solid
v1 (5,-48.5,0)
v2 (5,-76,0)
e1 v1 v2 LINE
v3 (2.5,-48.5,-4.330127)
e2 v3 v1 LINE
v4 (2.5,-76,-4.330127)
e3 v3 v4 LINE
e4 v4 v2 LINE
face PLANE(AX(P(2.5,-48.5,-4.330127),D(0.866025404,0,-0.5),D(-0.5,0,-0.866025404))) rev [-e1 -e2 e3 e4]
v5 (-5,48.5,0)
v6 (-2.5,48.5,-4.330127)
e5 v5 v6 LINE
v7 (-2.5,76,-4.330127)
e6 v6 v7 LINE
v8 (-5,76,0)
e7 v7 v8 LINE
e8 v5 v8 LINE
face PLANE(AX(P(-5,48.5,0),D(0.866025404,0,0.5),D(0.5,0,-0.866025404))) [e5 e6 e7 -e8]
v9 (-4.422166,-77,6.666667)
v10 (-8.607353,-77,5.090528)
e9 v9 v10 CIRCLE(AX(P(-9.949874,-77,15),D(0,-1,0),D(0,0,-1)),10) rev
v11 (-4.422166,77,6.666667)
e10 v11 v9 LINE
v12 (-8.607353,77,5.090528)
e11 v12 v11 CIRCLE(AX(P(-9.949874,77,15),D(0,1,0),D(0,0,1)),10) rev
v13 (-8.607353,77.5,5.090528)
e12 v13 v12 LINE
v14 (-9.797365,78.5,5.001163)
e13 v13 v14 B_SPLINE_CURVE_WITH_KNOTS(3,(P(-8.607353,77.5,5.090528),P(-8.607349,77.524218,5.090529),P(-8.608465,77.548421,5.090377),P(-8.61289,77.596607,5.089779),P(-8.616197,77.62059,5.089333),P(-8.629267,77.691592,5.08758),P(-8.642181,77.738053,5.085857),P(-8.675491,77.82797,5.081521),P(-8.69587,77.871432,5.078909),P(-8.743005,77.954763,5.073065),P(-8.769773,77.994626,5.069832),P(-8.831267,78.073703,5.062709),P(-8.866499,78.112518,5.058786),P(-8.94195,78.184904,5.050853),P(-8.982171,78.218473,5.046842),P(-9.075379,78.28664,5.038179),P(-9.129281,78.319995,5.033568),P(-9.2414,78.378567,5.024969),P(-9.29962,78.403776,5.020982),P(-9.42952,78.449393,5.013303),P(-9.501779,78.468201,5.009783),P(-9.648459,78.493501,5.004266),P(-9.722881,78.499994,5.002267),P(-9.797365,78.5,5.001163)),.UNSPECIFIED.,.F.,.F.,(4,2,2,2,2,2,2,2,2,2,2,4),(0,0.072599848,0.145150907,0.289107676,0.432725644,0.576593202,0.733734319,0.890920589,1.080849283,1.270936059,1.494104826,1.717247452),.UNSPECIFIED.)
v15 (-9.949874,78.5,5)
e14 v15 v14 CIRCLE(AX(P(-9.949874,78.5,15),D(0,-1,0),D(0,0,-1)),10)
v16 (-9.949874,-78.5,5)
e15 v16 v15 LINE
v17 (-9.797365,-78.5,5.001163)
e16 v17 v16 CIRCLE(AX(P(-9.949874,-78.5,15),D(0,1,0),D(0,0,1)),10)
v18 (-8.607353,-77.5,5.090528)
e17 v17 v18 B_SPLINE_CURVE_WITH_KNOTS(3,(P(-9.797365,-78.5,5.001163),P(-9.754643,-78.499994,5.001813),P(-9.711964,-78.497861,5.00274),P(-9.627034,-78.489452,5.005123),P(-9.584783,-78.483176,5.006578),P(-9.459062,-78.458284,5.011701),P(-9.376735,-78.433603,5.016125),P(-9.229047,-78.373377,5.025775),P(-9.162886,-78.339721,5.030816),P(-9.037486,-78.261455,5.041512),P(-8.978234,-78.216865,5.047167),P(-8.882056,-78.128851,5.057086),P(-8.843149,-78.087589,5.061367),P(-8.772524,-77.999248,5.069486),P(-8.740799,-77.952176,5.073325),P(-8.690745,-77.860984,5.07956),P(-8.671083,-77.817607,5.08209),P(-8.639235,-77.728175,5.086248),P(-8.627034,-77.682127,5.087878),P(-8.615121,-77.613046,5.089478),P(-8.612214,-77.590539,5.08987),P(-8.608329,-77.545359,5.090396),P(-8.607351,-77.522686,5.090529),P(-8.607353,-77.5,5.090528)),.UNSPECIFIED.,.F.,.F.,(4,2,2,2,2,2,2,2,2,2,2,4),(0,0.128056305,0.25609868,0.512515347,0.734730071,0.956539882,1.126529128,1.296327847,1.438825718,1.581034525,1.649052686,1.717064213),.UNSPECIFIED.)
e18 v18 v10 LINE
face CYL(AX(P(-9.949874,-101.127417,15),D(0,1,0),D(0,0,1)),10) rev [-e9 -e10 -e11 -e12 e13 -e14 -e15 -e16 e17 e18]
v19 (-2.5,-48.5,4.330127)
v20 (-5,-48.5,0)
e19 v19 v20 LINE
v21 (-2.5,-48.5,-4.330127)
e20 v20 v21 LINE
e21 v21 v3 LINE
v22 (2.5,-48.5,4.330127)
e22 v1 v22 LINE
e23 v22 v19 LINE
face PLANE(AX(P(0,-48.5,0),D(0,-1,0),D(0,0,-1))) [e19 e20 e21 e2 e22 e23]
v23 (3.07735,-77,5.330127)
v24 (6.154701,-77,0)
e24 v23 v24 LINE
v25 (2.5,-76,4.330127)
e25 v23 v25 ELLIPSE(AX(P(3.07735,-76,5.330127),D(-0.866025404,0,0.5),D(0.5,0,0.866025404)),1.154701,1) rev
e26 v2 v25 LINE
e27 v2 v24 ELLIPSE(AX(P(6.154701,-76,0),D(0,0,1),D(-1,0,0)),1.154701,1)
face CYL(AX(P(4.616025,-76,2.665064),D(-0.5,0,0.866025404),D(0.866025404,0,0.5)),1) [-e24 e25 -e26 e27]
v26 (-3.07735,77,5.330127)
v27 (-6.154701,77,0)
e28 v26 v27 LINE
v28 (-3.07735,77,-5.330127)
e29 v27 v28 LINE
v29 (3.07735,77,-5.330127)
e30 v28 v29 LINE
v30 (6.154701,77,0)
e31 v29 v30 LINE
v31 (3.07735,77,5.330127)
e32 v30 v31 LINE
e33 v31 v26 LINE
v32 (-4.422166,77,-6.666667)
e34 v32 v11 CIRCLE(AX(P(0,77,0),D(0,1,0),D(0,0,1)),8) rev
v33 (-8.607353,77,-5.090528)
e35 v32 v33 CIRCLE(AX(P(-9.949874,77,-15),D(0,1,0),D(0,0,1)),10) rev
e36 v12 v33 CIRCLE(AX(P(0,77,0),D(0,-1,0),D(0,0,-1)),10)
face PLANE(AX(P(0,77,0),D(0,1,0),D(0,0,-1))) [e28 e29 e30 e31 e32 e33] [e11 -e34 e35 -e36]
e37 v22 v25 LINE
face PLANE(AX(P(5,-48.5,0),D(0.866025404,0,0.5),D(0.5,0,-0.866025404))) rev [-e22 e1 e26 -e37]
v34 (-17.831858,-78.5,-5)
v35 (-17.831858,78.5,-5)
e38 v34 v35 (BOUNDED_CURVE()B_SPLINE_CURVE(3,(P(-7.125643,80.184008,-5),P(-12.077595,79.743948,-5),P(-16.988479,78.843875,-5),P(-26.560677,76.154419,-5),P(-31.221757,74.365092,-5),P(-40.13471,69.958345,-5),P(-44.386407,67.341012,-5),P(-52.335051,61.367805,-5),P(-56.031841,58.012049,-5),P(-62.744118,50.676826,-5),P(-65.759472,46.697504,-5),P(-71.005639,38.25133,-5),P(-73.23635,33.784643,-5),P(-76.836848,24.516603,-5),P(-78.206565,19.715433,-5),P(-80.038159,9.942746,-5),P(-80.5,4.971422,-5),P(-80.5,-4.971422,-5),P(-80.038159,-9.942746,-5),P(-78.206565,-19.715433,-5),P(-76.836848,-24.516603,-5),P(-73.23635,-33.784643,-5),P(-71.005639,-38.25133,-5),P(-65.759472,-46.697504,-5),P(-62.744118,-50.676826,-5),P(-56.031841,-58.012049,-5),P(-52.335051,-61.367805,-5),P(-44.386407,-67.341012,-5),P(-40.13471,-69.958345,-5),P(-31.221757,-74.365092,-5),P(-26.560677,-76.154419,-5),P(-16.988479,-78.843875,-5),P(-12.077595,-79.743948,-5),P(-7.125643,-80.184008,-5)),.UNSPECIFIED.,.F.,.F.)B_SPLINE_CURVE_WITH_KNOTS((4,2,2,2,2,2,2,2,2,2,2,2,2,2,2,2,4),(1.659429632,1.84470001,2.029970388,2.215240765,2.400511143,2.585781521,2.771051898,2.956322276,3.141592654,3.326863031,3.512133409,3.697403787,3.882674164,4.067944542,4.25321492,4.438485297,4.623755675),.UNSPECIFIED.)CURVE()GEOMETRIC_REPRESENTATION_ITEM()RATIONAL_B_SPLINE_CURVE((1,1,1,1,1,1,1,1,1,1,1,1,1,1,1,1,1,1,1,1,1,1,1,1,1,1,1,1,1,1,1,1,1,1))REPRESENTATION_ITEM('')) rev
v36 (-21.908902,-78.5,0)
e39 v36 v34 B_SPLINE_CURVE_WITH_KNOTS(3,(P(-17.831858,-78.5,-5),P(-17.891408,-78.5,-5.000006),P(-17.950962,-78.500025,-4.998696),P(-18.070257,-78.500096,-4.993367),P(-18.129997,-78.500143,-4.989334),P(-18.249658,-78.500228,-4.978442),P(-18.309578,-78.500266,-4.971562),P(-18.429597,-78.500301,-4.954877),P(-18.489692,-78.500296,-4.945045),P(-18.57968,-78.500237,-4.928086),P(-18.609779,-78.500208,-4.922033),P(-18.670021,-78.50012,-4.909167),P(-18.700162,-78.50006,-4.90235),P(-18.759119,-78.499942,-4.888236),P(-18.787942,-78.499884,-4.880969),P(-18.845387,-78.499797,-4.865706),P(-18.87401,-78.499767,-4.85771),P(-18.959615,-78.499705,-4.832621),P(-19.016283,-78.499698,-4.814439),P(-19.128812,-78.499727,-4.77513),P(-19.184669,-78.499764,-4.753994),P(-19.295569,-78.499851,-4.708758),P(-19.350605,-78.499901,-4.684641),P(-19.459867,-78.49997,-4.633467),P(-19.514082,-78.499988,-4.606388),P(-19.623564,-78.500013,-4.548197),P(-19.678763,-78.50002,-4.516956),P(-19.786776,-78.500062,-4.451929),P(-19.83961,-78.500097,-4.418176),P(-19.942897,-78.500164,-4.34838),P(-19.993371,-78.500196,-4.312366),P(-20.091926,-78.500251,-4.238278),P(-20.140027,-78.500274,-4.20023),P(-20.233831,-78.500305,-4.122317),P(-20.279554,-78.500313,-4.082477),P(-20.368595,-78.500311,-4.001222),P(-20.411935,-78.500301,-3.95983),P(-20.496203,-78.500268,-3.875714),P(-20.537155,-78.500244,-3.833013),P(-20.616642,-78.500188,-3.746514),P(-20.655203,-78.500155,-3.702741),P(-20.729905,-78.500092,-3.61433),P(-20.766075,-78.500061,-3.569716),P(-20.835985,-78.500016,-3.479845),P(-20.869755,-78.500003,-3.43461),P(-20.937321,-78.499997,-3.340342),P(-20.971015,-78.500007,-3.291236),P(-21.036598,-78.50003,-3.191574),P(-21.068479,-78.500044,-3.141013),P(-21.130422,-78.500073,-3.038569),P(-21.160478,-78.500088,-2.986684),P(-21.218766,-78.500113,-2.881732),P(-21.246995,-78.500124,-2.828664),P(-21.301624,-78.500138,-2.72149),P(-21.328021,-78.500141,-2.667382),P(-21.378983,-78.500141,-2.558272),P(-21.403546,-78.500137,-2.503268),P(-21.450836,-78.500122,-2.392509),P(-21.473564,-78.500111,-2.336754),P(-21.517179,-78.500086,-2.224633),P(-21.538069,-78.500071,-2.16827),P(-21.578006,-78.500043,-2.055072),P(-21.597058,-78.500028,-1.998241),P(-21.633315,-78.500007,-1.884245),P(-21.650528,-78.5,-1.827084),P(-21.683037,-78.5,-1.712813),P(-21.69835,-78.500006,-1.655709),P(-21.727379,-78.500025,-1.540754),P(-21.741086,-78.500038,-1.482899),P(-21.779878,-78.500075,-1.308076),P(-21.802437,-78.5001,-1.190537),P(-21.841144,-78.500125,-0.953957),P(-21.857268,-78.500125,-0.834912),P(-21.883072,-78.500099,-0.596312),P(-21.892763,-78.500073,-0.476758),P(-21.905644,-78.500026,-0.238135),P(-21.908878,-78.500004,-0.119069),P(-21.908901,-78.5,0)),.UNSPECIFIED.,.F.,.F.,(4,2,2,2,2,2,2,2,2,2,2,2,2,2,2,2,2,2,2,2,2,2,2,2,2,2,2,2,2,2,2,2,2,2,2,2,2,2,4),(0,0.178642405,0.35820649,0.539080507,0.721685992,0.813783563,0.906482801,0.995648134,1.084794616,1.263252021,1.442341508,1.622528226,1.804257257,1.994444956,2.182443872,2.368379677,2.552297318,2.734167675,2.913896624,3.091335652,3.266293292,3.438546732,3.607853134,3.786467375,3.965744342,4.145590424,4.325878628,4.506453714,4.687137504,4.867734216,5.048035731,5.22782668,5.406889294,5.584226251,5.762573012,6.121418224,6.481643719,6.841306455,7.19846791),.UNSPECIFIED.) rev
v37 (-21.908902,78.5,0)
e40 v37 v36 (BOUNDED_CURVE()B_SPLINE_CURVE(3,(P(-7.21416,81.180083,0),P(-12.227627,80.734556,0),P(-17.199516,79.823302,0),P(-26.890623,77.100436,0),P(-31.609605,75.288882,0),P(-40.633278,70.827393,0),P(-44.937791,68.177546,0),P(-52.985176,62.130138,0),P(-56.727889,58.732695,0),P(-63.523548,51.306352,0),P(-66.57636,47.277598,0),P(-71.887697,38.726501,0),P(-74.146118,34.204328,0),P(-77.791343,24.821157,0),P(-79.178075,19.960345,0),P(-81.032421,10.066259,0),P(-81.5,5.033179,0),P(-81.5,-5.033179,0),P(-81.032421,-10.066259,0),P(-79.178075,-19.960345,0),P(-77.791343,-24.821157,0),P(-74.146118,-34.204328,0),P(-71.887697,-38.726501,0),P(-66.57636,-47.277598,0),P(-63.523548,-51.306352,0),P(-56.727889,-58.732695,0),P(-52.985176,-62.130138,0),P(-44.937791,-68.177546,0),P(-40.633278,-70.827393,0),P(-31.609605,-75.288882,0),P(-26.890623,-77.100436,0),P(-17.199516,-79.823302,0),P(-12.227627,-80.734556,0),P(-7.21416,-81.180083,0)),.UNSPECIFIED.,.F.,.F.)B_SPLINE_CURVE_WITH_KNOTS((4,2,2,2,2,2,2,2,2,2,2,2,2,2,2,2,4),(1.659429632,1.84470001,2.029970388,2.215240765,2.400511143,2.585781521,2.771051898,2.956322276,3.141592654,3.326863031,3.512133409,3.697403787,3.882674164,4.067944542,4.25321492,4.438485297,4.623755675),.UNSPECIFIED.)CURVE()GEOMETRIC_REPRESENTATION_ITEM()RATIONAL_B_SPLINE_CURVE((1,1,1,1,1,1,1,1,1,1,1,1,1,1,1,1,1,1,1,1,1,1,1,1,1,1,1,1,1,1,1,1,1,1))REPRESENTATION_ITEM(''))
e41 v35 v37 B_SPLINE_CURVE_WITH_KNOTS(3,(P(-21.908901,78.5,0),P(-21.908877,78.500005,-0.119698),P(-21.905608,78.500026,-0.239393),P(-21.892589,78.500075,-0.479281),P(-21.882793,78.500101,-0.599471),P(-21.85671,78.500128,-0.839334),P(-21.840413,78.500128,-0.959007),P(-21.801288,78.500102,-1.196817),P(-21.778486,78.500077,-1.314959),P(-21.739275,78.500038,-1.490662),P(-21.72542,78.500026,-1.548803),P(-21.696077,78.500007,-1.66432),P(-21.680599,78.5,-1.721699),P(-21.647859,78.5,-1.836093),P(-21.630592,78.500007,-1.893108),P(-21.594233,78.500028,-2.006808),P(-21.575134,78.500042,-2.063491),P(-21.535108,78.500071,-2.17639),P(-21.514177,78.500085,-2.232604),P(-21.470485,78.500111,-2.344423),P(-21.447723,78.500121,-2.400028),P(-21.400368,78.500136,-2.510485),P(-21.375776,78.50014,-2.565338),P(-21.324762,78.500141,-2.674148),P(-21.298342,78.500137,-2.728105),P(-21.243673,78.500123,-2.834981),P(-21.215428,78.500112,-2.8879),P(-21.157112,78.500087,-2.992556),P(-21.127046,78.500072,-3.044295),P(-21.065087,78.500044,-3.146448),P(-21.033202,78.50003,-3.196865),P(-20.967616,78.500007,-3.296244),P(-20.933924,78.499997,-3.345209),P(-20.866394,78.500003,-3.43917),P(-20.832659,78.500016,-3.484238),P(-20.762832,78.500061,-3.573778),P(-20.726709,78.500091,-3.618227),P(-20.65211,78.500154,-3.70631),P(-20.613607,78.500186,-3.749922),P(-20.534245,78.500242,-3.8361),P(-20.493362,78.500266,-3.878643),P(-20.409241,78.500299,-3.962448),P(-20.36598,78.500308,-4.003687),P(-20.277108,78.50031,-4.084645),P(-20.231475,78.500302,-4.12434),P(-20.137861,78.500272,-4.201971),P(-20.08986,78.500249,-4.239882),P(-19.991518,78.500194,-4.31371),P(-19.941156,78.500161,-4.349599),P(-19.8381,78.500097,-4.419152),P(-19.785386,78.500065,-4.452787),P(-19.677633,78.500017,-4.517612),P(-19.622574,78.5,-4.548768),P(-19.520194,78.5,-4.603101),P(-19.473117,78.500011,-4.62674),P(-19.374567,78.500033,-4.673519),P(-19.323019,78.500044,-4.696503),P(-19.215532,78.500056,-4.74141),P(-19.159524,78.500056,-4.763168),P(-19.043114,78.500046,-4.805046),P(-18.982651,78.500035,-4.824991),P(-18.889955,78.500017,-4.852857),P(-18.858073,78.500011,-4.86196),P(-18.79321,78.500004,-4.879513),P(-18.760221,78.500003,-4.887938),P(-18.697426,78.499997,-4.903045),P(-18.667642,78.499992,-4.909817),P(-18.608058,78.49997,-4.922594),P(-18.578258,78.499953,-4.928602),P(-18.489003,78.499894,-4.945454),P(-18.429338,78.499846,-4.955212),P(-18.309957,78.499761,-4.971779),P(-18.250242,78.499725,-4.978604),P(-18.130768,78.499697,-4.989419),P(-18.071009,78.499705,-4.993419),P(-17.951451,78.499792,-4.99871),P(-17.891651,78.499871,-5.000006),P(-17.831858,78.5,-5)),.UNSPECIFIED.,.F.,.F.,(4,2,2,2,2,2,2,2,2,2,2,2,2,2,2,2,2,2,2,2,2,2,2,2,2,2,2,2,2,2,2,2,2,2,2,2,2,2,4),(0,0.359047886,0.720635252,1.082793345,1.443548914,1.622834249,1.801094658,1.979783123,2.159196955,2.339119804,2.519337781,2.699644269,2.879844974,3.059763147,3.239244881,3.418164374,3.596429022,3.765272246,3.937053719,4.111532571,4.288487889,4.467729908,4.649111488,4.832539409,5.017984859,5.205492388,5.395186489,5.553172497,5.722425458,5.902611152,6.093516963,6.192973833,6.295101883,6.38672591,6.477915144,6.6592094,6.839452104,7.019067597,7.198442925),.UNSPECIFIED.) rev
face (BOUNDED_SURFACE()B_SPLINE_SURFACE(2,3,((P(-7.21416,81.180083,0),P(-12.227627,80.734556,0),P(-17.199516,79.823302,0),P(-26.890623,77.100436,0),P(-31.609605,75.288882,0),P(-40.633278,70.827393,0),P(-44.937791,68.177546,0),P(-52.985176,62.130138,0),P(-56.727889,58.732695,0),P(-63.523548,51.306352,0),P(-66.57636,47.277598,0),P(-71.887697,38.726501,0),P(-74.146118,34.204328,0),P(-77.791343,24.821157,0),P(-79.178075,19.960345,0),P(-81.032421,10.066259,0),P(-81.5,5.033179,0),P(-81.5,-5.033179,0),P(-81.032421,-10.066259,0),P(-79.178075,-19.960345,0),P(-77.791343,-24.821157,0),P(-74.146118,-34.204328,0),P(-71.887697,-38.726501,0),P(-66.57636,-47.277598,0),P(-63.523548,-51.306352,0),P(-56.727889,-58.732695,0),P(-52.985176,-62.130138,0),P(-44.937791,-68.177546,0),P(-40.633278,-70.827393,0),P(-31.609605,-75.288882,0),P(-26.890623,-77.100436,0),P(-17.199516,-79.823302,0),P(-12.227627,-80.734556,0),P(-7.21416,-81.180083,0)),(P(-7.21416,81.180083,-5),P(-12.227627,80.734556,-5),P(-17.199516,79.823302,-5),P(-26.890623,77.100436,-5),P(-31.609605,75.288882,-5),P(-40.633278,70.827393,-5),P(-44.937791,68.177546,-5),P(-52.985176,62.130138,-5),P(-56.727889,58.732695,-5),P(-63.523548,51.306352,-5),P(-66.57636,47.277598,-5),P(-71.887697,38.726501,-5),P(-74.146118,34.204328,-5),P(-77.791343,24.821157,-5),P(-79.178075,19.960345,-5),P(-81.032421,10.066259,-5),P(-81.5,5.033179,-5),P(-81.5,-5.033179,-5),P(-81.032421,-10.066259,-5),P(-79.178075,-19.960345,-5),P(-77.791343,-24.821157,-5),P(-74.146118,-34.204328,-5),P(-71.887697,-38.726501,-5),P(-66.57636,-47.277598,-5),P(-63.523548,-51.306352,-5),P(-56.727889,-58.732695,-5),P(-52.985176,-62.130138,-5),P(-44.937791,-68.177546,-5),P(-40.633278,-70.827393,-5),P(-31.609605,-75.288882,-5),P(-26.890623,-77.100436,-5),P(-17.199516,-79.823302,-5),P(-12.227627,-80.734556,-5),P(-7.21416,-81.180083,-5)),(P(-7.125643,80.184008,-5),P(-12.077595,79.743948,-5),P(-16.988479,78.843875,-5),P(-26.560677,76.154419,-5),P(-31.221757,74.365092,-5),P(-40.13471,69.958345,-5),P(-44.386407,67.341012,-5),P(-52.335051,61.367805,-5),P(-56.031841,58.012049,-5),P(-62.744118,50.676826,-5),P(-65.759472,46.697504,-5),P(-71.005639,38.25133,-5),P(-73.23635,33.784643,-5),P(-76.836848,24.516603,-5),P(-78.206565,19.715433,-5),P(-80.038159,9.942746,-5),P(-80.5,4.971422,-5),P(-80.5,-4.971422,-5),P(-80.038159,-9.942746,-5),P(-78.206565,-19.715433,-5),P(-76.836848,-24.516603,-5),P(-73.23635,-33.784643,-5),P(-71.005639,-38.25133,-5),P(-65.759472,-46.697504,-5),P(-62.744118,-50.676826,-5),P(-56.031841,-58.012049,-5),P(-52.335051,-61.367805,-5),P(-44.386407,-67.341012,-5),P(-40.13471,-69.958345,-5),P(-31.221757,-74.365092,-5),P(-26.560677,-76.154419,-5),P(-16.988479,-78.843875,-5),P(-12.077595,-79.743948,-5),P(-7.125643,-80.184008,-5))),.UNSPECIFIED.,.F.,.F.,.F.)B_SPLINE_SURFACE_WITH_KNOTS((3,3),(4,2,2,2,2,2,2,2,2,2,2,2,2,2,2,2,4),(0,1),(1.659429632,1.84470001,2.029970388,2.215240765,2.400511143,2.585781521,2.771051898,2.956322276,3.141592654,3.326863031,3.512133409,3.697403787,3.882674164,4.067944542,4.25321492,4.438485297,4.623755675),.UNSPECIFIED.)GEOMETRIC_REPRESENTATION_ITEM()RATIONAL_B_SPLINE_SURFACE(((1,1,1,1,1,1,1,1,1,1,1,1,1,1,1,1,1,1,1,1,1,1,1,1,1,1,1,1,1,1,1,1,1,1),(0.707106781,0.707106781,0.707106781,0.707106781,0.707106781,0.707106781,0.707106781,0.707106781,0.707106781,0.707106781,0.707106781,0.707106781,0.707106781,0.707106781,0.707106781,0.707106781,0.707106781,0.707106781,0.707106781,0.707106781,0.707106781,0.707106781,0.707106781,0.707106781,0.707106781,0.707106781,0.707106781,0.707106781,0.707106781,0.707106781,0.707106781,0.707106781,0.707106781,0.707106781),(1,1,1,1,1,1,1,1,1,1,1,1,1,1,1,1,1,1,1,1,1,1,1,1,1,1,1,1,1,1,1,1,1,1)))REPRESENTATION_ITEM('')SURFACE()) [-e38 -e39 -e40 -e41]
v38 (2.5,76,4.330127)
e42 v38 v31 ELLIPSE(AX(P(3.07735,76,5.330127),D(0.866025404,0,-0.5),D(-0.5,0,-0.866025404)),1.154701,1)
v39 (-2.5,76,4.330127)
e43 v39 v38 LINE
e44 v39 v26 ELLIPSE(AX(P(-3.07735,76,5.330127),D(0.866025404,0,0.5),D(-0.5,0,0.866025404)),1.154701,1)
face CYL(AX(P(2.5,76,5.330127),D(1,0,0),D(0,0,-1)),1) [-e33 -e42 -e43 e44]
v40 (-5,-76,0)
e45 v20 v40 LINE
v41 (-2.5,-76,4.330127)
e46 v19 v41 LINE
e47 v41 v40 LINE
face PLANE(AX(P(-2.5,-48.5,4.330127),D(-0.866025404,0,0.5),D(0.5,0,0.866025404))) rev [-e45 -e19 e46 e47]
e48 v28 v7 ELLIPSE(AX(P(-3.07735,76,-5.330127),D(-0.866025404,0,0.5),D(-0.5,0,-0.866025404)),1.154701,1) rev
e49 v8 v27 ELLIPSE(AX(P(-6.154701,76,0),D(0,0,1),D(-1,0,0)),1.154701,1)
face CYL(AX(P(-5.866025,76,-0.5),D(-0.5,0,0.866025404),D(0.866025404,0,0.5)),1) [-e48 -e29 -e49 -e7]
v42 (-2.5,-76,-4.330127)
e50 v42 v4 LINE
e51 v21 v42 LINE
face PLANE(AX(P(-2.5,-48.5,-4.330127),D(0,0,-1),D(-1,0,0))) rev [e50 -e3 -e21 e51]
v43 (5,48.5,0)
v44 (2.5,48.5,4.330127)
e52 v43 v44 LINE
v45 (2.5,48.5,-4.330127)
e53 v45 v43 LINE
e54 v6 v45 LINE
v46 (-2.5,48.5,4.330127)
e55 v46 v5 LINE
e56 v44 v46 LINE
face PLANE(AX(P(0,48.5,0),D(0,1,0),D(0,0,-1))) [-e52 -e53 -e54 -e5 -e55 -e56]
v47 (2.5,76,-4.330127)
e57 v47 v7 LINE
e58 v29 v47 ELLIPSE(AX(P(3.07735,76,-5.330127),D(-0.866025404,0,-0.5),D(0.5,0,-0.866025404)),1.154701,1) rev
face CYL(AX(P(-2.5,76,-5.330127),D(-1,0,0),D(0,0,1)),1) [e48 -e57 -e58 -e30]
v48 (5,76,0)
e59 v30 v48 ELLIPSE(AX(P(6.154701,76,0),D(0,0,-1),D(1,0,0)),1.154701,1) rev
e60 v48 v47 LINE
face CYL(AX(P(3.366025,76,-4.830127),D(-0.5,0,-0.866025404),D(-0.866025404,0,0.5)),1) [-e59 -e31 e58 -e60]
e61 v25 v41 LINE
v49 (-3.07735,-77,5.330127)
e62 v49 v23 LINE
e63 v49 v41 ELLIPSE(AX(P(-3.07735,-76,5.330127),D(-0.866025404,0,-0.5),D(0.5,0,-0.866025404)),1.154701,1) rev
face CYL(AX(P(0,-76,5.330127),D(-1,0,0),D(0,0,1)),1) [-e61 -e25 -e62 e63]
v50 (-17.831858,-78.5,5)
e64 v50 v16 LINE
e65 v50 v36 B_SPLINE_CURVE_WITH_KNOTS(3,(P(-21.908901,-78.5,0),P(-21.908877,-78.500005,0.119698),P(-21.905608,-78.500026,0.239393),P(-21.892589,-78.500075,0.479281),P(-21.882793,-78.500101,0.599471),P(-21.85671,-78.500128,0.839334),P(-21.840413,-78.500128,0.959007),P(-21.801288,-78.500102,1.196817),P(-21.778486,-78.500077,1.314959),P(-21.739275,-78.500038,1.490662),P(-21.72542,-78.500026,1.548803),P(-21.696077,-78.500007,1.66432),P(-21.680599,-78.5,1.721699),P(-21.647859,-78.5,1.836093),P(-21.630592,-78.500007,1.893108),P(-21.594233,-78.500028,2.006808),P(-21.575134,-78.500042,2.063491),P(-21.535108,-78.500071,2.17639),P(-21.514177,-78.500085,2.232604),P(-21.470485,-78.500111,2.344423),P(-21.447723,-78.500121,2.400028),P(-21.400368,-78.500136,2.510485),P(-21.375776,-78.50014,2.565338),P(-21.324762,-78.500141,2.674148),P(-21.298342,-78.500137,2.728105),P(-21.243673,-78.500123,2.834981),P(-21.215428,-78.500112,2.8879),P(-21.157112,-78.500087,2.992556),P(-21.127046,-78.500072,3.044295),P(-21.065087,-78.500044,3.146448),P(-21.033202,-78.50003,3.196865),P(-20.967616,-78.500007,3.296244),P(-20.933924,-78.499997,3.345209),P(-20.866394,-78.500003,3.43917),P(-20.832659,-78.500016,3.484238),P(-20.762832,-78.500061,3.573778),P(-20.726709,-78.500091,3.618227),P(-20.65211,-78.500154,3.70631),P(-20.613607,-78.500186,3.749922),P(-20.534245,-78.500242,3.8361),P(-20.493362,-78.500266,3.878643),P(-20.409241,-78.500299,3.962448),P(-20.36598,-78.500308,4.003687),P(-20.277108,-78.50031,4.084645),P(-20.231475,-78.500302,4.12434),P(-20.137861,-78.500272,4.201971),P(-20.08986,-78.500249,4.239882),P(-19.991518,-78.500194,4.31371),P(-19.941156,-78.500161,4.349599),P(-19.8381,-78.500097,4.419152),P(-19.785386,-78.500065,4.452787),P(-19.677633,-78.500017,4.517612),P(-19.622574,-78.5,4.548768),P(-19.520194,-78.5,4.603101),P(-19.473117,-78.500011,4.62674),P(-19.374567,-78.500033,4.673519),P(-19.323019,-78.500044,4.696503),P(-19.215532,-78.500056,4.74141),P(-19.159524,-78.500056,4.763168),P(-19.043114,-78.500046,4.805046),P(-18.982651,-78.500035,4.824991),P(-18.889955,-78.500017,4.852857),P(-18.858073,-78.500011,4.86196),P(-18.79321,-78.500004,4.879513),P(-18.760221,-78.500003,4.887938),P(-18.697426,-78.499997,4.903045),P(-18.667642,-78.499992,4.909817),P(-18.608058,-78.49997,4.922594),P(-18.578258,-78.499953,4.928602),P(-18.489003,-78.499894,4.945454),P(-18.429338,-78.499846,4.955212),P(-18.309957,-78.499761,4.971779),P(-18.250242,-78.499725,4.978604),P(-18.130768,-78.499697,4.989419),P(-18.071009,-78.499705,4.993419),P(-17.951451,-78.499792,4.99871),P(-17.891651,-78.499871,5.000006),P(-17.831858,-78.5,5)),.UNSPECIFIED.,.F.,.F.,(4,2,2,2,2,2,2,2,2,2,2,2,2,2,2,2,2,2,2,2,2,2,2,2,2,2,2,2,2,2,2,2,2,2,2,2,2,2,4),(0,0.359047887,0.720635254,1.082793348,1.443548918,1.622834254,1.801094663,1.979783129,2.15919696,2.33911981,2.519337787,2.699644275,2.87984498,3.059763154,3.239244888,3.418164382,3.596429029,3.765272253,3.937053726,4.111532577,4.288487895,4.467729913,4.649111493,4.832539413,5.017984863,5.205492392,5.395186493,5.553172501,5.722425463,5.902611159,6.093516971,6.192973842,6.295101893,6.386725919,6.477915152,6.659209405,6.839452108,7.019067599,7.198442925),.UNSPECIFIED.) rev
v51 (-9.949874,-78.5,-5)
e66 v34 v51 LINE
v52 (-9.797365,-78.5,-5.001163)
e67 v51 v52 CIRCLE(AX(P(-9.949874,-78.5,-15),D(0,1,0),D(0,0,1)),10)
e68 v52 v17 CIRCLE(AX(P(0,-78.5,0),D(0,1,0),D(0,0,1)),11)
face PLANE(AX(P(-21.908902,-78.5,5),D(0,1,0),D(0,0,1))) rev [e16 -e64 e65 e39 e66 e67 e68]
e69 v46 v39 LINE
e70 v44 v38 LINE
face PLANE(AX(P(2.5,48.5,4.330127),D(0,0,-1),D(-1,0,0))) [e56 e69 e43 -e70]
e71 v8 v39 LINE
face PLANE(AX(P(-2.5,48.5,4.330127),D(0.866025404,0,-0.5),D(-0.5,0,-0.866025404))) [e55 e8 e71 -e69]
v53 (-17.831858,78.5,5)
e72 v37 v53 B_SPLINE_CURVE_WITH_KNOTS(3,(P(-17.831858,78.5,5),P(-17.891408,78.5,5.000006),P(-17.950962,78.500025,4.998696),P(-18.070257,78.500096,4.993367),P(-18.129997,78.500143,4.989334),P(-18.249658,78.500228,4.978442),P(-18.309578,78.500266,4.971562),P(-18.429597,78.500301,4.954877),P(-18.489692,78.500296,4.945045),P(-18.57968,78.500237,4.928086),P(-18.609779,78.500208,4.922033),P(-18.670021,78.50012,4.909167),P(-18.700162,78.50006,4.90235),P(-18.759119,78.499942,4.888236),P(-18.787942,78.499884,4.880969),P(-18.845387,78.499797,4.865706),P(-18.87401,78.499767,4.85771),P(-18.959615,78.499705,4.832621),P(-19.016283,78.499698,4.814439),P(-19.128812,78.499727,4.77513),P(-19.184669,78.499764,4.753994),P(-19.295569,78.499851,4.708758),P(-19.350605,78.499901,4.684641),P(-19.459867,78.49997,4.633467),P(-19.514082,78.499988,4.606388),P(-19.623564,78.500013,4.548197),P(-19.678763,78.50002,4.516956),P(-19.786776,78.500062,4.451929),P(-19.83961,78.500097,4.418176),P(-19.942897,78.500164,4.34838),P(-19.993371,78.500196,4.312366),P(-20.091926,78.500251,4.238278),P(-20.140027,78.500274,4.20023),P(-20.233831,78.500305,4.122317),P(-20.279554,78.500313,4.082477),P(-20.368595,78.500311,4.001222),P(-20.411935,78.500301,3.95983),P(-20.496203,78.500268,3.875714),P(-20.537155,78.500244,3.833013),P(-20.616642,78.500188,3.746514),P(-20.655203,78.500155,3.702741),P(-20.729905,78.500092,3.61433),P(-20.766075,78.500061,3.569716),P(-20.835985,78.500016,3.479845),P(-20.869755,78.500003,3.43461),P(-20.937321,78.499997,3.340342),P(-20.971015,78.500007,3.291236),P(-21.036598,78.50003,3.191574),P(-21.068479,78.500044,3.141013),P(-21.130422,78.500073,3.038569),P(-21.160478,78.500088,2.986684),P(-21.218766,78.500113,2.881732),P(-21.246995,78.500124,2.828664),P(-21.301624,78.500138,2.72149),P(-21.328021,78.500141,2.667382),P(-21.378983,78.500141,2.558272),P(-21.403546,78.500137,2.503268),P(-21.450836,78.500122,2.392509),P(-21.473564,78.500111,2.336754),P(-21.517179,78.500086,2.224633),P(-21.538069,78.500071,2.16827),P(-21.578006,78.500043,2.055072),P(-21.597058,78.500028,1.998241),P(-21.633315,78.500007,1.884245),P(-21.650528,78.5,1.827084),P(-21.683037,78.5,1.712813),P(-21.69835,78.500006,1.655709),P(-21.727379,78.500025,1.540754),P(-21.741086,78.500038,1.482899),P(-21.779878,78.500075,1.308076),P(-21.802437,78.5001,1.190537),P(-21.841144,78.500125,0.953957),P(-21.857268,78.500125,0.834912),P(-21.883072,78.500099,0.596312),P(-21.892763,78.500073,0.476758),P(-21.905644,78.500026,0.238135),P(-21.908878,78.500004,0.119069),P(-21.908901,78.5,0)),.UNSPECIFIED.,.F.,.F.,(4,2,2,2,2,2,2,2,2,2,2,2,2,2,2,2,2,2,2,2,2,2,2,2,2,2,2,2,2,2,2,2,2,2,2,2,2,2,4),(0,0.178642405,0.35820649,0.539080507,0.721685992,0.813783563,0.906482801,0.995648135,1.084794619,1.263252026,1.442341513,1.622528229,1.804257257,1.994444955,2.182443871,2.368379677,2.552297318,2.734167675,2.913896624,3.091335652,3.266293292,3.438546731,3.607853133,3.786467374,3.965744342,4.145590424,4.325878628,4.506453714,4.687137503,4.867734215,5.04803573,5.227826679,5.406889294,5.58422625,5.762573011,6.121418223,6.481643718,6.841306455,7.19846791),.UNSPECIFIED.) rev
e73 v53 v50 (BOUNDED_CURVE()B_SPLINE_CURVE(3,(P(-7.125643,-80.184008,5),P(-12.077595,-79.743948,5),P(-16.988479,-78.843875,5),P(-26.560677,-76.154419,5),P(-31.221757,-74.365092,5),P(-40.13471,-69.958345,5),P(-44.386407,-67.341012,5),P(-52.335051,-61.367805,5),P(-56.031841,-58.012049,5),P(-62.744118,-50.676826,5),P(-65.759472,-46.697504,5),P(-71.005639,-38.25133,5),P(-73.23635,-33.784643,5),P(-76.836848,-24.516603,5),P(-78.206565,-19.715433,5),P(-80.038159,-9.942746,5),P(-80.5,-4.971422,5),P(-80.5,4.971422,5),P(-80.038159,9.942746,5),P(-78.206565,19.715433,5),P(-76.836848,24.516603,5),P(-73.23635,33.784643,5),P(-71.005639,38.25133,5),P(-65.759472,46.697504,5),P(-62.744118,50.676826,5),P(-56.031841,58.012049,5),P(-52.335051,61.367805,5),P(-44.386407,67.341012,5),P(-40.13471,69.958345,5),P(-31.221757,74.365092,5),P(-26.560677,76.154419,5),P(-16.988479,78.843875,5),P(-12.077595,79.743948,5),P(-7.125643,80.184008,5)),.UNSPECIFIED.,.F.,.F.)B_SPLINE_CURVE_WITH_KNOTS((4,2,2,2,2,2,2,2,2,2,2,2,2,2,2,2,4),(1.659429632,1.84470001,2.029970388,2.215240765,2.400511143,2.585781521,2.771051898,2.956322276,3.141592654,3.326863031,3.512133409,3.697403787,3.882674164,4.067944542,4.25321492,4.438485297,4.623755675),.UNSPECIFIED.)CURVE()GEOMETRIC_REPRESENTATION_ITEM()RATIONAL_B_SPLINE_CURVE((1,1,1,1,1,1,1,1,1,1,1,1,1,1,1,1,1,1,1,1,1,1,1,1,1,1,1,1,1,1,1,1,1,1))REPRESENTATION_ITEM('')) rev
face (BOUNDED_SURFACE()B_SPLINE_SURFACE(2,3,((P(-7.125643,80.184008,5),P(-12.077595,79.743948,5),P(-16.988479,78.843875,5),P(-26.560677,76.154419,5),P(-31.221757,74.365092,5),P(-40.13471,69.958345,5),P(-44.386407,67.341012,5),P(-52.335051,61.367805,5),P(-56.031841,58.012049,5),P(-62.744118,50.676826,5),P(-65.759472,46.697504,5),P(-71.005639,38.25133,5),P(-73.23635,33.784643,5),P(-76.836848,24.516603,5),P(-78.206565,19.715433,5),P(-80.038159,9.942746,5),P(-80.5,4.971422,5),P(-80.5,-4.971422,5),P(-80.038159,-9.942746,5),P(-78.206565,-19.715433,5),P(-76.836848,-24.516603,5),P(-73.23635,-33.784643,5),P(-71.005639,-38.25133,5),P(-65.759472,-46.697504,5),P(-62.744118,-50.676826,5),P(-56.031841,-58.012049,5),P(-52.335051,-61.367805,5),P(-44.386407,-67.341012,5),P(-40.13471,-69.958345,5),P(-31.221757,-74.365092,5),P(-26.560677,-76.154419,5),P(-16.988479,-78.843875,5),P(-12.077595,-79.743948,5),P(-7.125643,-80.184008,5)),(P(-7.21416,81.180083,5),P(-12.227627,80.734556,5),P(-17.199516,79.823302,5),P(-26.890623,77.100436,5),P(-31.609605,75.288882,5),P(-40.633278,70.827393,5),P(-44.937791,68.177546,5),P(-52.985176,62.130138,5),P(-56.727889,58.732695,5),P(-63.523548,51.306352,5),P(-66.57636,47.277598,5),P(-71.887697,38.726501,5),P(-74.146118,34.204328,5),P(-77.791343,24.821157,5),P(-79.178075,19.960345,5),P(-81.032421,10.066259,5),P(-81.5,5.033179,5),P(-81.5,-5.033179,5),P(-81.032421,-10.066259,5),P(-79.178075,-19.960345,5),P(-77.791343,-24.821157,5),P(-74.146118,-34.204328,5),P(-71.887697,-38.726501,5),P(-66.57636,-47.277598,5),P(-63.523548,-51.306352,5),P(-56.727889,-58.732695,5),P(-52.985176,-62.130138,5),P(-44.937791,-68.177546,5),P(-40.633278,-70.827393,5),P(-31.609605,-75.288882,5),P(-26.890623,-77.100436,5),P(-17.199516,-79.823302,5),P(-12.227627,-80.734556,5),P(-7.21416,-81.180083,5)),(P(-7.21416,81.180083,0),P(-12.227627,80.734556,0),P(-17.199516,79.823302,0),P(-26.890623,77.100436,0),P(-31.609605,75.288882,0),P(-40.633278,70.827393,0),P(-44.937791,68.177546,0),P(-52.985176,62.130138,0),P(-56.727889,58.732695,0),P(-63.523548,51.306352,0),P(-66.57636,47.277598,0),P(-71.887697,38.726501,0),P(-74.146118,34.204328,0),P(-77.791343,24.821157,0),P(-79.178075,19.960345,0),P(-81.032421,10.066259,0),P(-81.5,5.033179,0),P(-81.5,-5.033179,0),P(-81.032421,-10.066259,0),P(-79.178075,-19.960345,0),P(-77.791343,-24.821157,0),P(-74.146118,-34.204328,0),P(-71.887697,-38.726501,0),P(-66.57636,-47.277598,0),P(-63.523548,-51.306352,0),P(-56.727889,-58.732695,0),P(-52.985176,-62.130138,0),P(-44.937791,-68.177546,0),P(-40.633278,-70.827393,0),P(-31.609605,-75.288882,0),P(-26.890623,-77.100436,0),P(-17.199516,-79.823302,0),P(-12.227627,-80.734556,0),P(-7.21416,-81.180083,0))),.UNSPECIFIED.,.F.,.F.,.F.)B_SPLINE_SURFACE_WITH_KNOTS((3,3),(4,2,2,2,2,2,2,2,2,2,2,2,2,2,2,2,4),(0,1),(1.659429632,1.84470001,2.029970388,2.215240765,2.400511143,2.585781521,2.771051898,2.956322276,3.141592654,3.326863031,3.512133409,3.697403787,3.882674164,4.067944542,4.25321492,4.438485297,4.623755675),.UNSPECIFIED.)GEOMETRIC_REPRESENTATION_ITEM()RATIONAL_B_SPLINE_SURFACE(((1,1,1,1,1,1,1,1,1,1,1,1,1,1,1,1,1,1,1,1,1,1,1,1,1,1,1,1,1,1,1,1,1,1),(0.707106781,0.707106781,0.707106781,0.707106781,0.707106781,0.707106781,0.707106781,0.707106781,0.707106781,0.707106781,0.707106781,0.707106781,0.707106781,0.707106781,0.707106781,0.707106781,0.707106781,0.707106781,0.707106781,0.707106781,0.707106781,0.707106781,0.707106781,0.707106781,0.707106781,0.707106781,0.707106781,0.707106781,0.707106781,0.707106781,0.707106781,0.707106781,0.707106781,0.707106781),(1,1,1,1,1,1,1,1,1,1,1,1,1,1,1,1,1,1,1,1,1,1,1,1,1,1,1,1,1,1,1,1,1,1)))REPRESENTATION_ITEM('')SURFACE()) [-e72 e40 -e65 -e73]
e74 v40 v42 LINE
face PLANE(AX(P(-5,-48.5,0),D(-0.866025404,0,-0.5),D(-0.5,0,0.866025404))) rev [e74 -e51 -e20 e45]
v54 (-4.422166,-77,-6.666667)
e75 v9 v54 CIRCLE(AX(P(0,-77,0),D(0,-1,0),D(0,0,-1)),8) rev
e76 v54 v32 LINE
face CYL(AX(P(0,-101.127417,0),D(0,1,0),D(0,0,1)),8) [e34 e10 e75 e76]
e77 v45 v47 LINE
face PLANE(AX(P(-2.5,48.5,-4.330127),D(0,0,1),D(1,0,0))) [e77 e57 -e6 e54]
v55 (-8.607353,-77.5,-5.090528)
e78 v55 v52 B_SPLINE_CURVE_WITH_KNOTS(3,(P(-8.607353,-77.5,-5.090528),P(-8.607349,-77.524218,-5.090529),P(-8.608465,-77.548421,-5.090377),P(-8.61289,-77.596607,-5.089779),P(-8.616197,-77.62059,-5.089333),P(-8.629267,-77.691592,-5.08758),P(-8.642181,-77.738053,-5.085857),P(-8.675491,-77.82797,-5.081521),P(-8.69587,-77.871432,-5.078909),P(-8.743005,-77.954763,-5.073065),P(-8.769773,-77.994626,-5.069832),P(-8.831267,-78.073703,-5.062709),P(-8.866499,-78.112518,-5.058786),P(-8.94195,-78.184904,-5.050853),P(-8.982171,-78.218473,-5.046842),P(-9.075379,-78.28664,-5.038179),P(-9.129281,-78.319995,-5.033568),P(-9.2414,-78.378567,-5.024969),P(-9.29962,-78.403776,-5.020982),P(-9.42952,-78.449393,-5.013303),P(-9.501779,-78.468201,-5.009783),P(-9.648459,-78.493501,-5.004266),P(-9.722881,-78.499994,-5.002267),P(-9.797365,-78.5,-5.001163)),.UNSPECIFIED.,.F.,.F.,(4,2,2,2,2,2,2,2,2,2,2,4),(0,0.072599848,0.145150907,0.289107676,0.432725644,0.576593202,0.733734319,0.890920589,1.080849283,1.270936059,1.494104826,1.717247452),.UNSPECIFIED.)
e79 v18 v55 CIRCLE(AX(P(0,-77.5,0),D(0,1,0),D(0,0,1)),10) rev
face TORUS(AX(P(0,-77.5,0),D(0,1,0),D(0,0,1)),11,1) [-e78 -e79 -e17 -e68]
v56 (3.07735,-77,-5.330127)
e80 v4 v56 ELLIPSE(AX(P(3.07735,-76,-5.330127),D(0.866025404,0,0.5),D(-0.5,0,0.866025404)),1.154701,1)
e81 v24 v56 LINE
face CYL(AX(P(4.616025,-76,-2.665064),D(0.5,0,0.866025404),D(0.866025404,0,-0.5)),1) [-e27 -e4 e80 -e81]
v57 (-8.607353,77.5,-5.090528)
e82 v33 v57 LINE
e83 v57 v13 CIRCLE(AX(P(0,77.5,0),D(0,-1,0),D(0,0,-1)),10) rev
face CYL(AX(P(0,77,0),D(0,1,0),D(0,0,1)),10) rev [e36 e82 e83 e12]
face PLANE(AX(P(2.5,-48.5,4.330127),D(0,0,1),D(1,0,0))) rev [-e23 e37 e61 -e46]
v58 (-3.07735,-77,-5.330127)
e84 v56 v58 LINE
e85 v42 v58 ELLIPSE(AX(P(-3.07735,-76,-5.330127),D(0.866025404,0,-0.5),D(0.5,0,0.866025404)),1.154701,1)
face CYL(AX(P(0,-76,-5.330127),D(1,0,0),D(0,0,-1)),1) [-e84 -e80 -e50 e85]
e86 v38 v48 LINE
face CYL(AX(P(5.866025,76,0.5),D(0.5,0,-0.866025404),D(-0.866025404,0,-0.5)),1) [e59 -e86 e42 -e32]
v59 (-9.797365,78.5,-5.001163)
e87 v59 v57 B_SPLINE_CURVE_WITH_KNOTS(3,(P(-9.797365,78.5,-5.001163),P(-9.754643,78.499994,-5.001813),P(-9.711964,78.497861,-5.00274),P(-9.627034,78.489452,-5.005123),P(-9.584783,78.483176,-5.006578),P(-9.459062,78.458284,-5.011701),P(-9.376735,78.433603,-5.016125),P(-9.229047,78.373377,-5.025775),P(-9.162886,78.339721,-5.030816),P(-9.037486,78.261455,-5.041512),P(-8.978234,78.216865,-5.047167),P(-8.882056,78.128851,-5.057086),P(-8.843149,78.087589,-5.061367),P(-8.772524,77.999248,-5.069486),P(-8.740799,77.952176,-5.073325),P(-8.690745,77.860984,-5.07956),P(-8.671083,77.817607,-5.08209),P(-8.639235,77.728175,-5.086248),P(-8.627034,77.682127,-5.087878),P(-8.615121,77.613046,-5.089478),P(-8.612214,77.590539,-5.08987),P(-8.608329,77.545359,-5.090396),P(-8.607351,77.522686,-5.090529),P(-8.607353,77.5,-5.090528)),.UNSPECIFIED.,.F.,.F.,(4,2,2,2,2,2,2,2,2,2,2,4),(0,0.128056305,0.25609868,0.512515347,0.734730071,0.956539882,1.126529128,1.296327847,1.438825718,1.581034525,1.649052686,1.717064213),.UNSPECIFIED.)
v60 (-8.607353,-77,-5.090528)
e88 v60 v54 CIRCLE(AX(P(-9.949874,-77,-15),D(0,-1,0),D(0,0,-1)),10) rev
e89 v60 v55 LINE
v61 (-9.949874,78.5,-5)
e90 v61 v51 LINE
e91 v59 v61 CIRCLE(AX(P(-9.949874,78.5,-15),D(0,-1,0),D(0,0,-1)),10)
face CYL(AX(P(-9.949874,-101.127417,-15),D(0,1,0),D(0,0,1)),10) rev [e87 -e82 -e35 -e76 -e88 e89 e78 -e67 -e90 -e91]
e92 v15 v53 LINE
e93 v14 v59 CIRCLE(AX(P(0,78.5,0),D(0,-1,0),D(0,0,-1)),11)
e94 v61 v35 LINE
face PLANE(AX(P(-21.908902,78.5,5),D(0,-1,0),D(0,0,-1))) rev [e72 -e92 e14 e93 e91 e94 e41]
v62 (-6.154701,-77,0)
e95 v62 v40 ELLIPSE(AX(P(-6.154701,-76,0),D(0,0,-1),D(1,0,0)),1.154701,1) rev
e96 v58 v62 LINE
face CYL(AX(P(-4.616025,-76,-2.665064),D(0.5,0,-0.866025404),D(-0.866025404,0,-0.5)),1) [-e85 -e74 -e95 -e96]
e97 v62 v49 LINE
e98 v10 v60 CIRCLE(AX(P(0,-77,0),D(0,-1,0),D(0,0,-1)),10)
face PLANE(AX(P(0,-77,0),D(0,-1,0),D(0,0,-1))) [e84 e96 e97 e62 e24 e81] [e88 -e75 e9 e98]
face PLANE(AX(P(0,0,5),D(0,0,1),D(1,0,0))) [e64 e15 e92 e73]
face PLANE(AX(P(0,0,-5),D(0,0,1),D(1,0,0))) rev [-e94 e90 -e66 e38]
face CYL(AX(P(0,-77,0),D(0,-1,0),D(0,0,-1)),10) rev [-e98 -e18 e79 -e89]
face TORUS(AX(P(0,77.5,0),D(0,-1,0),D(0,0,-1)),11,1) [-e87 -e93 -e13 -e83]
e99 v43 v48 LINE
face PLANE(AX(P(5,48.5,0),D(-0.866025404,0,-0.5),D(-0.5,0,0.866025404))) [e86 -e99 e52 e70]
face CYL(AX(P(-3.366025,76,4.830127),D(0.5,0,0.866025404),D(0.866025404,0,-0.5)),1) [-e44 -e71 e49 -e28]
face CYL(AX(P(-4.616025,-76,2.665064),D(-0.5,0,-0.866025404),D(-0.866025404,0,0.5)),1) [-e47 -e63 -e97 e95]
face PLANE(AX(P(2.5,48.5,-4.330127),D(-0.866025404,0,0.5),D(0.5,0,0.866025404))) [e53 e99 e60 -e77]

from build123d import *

# Parameters (mm, degrees)
BOSS_EXTRUDE1_DEPTH = 5
SKETCH2_R           = 8
BOSS_EXTRUDE2_DEPTH = 157
FILLET1_R           = 10
CUT_EXTRUDE1_DEPTH  = 30
SKETCH5_R           = 10
CUT_EXTRUDE2_DEPTH  = 1.5
FILLET2_SIZE        = 5
FILLET2_SIZE_2      = 1
FILLET4_R           = 1


with BuildPart() as part:
    # Sketch1 → Boss-Extrude1 (new, symmetric)
    with BuildSketch(Plane.XY):
        with BuildLine():
            Line((0, 78.5), (0, -78.5))
            Line((0, -78.5), (-21.9089023, -78.5))
            ThreePointArc((-21.9089023, -78.5), (-81.5, 0), (-21.9089023, 78.5))
            Line((-21.9089023, 78.5), (0, 78.5))
        make_face()
    extrude(amount=BOSS_EXTRUDE1_DEPTH, both=True)

    # Sketch2 → Boss-Extrude2 (add)
    with BuildSketch(Plane(origin=(0, 78.5, 0), x_dir=(1, 0, 0), z_dir=(0, 1, 0))):
        Circle(SKETCH2_R)
    extrude(amount=-BOSS_EXTRUDE2_DEPTH)

    # Fillet1
    fillet1_edges = [part.edges().sort_by_distance(p)[0] for p in [
        (-6.244997998, 0, -5),
        (-6.244997998, 0, 5),
    ]]
    fillet(fillet1_edges, radius=FILLET1_R)

    # Sketch3 → Cut-Extrude1 (cut)
    with BuildSketch(Plane.XZ.offset(78.5)):
        Polygon((2.5, -4.330127019), (5, 0), (2.5, 4.330127019), (-2.5, 4.330127019), (-5, 0), (-2.5, -4.330127019), align=None)
    cut_extrude1 = extrude(amount=-CUT_EXTRUDE1_DEPTH, mode=Mode.SUBTRACT)

    # Sketch5 → Cut-Extrude2 (cut)
    with BuildSketch(Plane.XZ.offset(78.5)):
        Circle(SKETCH5_R)
    cut_extrude2 = extrude(amount=-CUT_EXTRUDE2_DEPTH, mode=Mode.SUBTRACT)

    # Mirror1: Cut-Extrude1, Cut-Extrude2 across plane
    add(cut_extrude1.mirror(Plane.ZX), mode=Mode.SUBTRACT)
    add(cut_extrude2.mirror(Plane.ZX), mode=Mode.SUBTRACT)

    # Fillet2
    # an asymmetric fillet: 5, 1 mm, written as the material it takes off along each edge
    with BuildSketch(Plane(origin=(0, 0, 5), x_dir=(-0.11834786572698561, -0.9929721963266983, 0), z_dir=(0.9929721963266983, -0.11834786572698561, 0))) as fillet2_piece_1:
        with BuildLine():
            Bezier((81.5, FILLET2_SIZE), (81.5, 0), (81.5 - FILLET2_SIZE_2, 0), weights=[1, 0.707106781, 1])
            Line((81.5 - FILLET2_SIZE_2, 0), (81.5, 0))
            Line((81.5, 0), (81.5, FILLET2_SIZE))
        make_face()
    revolve(axis=Axis((0, 0, 5), (0, 0, -1)), revolution_arc=166.406474405, mode=Mode.SUBTRACT)
    with BuildSketch(Plane(origin=(0, 0, -5), x_dir=(-0.11834786572698561, -0.9929721963266983, 0), z_dir=(0.9929721963266983, -0.11834786572698561, 0))) as fillet2_piece_2:
        with BuildLine():
            Bezier((81.5 - FILLET2_SIZE_2, 0), (81.5, 0), (81.5, -FILLET2_SIZE), weights=[1, 0.707106781, 1])
            Line((81.5, -FILLET2_SIZE), (81.5, 0))
            Line((81.5, 0), (81.5 - FILLET2_SIZE_2, 0))
        make_face()
    revolve(axis=Axis((0, 0, -5), (0, 0, -1)), revolution_arc=166.406474405, mode=Mode.SUBTRACT)

    # Fillet4
    fillet4_edges = [part.edges().sort_by_distance(p)[0] for p in [
        (-3.75, 77, -2.165063509),
        (-10, 78.5, 0),
        (3.75, 77, -2.165063509),
        (0, 77, -4.330127019),
        (-3.75, 77, 2.165063509),
        (0, 77, 4.330127019),
        (3.75, 77, 2.165063509),
        (3.75, -77, -2.165063509),
        (-10, -78.5, 0),
        (0, -77, -4.330127019),
        (-3.75, -77, -2.165063509),
        (-3.75, -77, 2.165063509),
        (0, -77, 4.330127019),
        (3.75, -77, 2.165063509),
    ]]
    fillet(fillet4_edges, radius=FILLET4_R)


solid = part.part
